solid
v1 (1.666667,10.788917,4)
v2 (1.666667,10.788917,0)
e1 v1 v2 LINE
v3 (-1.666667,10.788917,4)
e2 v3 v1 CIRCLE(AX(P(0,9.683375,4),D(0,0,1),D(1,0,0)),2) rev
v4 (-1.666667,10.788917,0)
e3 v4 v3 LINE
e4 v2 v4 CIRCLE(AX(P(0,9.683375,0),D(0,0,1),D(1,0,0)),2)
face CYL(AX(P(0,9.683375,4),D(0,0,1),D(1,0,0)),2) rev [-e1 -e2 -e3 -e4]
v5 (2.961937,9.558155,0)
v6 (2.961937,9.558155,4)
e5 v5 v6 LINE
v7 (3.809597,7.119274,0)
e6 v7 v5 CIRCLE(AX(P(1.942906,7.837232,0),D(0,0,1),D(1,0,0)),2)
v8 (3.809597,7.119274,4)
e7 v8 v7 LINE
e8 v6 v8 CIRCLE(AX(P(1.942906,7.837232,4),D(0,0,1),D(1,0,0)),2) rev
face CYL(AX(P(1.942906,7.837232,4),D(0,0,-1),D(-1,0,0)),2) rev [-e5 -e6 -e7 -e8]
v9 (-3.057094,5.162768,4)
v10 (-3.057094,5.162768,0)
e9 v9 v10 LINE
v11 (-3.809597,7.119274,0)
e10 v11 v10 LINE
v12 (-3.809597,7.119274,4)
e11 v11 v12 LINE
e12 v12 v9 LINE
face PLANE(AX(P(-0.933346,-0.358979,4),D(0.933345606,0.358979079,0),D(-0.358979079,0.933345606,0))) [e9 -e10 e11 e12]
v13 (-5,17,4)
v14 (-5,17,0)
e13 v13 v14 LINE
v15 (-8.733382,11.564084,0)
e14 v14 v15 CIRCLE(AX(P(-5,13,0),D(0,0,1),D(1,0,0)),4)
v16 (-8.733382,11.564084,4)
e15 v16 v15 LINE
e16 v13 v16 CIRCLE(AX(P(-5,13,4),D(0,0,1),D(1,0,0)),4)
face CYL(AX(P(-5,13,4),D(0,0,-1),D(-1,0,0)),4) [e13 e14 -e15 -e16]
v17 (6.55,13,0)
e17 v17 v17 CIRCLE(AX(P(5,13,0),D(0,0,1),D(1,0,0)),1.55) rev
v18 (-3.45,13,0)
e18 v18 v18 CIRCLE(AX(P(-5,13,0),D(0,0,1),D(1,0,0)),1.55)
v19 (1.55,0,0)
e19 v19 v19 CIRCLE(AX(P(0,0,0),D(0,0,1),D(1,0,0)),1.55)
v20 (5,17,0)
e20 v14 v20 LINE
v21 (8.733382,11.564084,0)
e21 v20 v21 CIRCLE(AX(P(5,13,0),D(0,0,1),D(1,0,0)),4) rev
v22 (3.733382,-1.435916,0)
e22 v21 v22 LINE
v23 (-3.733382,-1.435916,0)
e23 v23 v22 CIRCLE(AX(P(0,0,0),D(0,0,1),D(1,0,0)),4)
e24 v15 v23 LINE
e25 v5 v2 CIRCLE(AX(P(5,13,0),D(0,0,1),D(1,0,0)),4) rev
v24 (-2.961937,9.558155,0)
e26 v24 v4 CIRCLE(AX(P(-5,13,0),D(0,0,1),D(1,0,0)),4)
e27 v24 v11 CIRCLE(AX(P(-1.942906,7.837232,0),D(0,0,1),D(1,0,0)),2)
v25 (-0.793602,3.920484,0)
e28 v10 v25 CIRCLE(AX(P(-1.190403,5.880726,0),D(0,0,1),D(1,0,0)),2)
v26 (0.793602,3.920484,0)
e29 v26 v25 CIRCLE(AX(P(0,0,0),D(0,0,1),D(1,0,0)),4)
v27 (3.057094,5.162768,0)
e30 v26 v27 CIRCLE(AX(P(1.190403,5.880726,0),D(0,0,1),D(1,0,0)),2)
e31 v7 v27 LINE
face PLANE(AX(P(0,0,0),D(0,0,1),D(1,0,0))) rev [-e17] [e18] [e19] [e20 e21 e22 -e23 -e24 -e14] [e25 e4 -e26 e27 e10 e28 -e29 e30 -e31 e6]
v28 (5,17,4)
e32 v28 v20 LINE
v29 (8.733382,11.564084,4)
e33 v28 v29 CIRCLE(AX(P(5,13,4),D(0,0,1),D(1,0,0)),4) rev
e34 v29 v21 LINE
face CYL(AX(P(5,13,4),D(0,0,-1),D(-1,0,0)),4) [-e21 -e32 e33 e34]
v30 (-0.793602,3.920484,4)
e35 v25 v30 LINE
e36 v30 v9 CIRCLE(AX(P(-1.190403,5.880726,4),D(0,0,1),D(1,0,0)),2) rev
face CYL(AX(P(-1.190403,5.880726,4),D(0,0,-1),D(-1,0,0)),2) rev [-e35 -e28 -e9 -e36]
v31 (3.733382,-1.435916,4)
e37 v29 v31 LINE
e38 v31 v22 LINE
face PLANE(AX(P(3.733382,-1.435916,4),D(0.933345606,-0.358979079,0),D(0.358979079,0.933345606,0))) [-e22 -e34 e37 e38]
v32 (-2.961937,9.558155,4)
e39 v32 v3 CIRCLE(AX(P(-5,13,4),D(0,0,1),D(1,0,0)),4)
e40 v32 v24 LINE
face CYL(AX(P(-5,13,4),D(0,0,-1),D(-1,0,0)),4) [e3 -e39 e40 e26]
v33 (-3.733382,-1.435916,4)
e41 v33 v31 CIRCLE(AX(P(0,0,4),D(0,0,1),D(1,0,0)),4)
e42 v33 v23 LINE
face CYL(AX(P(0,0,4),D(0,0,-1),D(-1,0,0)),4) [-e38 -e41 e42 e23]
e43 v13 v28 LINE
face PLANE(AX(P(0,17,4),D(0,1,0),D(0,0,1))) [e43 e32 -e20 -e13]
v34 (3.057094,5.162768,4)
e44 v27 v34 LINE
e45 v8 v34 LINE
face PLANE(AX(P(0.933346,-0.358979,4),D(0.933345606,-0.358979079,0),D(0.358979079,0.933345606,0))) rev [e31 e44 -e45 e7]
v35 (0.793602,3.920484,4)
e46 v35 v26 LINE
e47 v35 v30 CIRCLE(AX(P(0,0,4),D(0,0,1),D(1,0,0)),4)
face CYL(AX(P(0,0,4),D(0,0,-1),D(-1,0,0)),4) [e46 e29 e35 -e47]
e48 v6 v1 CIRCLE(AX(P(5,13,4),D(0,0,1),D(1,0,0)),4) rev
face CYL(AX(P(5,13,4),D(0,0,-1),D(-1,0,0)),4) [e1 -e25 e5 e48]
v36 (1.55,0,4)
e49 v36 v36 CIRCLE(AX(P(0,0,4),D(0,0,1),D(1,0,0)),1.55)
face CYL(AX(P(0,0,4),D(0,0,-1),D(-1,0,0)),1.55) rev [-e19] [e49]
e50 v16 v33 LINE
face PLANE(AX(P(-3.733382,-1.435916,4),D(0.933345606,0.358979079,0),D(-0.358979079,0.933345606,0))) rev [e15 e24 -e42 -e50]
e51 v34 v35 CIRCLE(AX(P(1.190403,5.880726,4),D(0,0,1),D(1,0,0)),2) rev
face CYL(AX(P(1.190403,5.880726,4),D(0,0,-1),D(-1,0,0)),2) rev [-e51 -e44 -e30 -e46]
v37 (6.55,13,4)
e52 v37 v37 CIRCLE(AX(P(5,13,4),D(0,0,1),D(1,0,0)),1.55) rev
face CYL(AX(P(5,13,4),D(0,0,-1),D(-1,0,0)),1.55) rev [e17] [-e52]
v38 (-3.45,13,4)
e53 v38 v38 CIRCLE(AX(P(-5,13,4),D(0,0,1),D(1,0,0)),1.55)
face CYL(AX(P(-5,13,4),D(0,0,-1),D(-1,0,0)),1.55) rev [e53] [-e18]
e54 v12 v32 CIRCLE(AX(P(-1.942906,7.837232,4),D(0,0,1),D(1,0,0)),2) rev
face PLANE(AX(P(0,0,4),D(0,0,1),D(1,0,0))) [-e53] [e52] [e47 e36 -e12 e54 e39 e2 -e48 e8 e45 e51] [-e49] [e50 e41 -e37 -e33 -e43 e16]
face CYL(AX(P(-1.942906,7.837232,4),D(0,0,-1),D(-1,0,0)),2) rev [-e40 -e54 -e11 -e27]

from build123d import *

# Parameters (mm, degrees)
SKETCH_1_R      = 4
SKETCH_1_R_2    = 1.55
EXTRUDE_1_DEPTH = 4
FILLET_1_R      = 2
FILLET_2_R      = 2


with BuildPart() as part:
    # 草图1 → 凸台-拉伸1 (new body)
    # profile 1 of 8: a face of its own
    with BuildSketch(Plane.XY):
        with BuildLine():
            ThreePointArc((-3.733382425, -1.435916317), (-3.830813532, 1.151028966), (-2.323665602, 3.25585291))
            Line((-2.323665602, 3.25585291), (-4.54302561, 9.026188932))
            ThreePointArc((-4.54302561, 9.026188932), (-7.072182387, 9.578587988), (-8.733382425, 11.564083683))
            Line((-8.733382425, 11.564083683), (-3.733382425, -1.435916317))
        make_face()
    # profile 2 of 8: a face of its own
    with BuildSketch(Plane.XY):
        with BuildLine():
            Line((4.54302561, 9.026188932), (2.323665602, 3.25585291))
            ThreePointArc((2.323665602, 3.25585291), (3.556308649, 1.831029436), (4, 0))
            ThreePointArc((4, 0), (3.932780804, -0.730229519), (3.733382425, -1.435916317))
            Line((3.733382425, -1.435916317), (8.733382425, 11.564083683))
            ThreePointArc((8.733382425, 11.564083683), (7.072182387, 9.578587988), (4.54302561, 9.026188932))
        make_face()
    # profile 3 of 8: a face of its own
    with BuildSketch(Plane.XY):
        with Locations((5, 13)):
            Circle(SKETCH_1_R)
        with Locations((5, 13)):
            Circle(SKETCH_1_R_2, mode=Mode.SUBTRACT)
    # profile 4 of 8: a face of its own
    with BuildSketch(Plane.XY):
        with Locations((-5, 13)):
            Circle(SKETCH_1_R)
        with Locations((-5, 13)):
            Circle(SKETCH_1_R_2, mode=Mode.SUBTRACT)
    # profile 5 of 8: a face of its own
    with BuildSketch(Plane.XY):
        with BuildLine():
            Line((-1, 13), (0, 13))
            Line((0, 13), (0, 17))
            Line((0, 17), (-5, 17))
            ThreePointArc((-5, 17), (-2.171572875, 15.828427125), (-1, 13))
        make_face()
    # profile 6 of 8: a face of its own
    with BuildSketch(Plane.XY):
        with BuildLine():
            Line((0, 17), (0, 13))
            Line((0, 13), (1, 13))
            ThreePointArc((1, 13), (2.171572875, 15.828427125), (5, 17))
            Line((5, 17), (0, 17))
        make_face()
    # profile 7 of 8: a face of its own
    with BuildSketch(Plane.XY):
        with BuildLine():
            ThreePointArc((2.323665602, 3.25585291), (1.219956631, 3.809423292), (0, 4))
            ThreePointArc((0, 4), (-1.219956631, 3.809423292), (-2.323665602, 3.25585291))
            ThreePointArc((-2.323665602, 3.25585291), (-3.830813532, 1.151028966), (-3.733382425, -1.435916317))
            ThreePointArc((-3.733382425, -1.435916317), (0, -4), (3.733382425, -1.435916317))
            ThreePointArc((3.733382425, -1.435916317), (3.932780804, -0.730229519), (4, 0))
            ThreePointArc((4, 0), (3.556308649, 1.831029436), (2.323665602, 3.25585291))
        make_face()
        with BuildLine():
            ThreePointArc((1.55, 0), (-1.096015511, -1.096015511), (0, 1.55))
            ThreePointArc((0, 1.55), (1.096015511, 1.096015511), (1.55, 0))
        make_face(mode=Mode.SUBTRACT)
    # profile 8 of 8: a face of its own
    with BuildSketch(Plane.XY):
        with BuildLine():
            ThreePointArc((2.323665602, 3.25585291), (1.219956631, 3.809423292), (0, 4))
            ThreePointArc((0, 4), (-1.219956631, 3.809423292), (-2.323665602, 3.25585291))
            ThreePointArc((-2.323665602, 3.25585291), (-3.830813532, 1.151028966), (-3.733382425, -1.435916317))
            ThreePointArc((-3.733382425, -1.435916317), (0, -4), (3.733382425, -1.435916317))
            ThreePointArc((3.733382425, -1.435916317), (3.932780804, -0.730229519), (4, 0))
            ThreePointArc((4, 0), (3.556308649, 1.831029436), (2.323665602, 3.25585291))
        make_face()
        with BuildLine():
            ThreePointArc((1.55, 0), (-1.096015511, -1.096015511), (0, 1.55))
            ThreePointArc((0, 1.55), (1.096015511, 1.096015511), (1.55, 0))
        make_face(mode=Mode.SUBTRACT)
    extrude(amount=EXTRUDE_1_DEPTH)

    # 圆角1
    # the kernel refuses this fillet: 2 mm, written as the material it adds along each edge
    with BuildSketch(Plane(origin=(-4.54302561, 9.026188932, 0), x_dir=(0.9477918493687586, 0.3188896521841818, 0), z_dir=(0, 0, 1))) as fillet_1_piece_1:
        with BuildLine():
            CenterArc((2.085226569, -1.956035073), FILLET_1_R, 102.035790206, 80.405931773)
            Line((0.087042425, -2.041241452), (0, 0))
            ThreePointArc((0, 0), (0.834090628, -0.087929854), (1.668181255, 0))
        make_face()
    extrude(amount=4)
    with BuildSketch(Plane(origin=(-2.323665602, 3.25585291, 0), x_dir=(-0.3589790793088693, 0.9333456062030594, 0), z_dir=(0, 0, 1)), Plane(origin=(4.54302561, 9.026188932, 0), x_dir=(-0.3589790793088692, -0.9333456062030594, 0), z_dir=(0, 0, 1))) as fillet_1_piece_2:
        with BuildLine():
            CenterArc((2.043096437, -2), FILLET_1_R, 90, 80.405931773)
            ThreePointArc((0.071069843, -1.666666667), (0.123384942, -0.829587241), (0, 0))
            Line((0, 0), (2.043096437, 0))
        make_face()
    extrude(amount=4)
    with BuildSketch(Plane(origin=(2.323665602, 3.25585291, 0), x_dir=(0.35897907930886913, 0.9333456062030596, 0), z_dir=(0, 0, 1))) as fillet_1_piece_3:
        with BuildLine():
            CenterArc((2.043096437, 2), FILLET_1_R, 189.594068227, 80.405931773)
            ThreePointArc((0.071069843, 1.666666667), (0.123384942, 0.829587241), (0, 0))
            Line((0, 0), (2.043096437, 0))
        make_face()
    extrude(amount=4)
    with BuildSketch(Plane(origin=(1, 13, 0), x_dir=(-1, 0, 0), z_dir=(0, 0, 1))) as fillet_1_piece_4:
        with BuildLine():
            CenterArc((1.656854249, 2), FILLET_1_R, 199.471220634, 70.528779366)
            ThreePointArc((-0.228763834, 1.333333333), (-0.057605761, 0.676407915), (0, 0))
            Line((0, 0), (1.656854249, 0))
        make_face()
    extrude(amount=4)
    with BuildSketch(Plane(origin=(-1, 13, 0), x_dir=(-0.16910197872576255, -0.9855985596534887, 0), z_dir=(0, 0, 1))) as fillet_1_piece_5:
        with BuildLine():
            CenterArc((1.691019787, 1.971197119), FILLET_1_R, 189.735610317, 70.528779366)
            Line((-0.280177332, 1.632993162), (0, 0))
            ThreePointArc((0, 0), (0.676407915, 0.057605761), (1.35281583, 0))
        make_face()
    extrude(amount=4)

    # 圆角2
    fillet_2_edges = [part.edges().sort_by_distance(p)[0] for p in [
        (0, 12.889058627, 2),
    ]]
    fillet(fillet_2_edges, radius=FILLET_2_R)


solid = part.part
